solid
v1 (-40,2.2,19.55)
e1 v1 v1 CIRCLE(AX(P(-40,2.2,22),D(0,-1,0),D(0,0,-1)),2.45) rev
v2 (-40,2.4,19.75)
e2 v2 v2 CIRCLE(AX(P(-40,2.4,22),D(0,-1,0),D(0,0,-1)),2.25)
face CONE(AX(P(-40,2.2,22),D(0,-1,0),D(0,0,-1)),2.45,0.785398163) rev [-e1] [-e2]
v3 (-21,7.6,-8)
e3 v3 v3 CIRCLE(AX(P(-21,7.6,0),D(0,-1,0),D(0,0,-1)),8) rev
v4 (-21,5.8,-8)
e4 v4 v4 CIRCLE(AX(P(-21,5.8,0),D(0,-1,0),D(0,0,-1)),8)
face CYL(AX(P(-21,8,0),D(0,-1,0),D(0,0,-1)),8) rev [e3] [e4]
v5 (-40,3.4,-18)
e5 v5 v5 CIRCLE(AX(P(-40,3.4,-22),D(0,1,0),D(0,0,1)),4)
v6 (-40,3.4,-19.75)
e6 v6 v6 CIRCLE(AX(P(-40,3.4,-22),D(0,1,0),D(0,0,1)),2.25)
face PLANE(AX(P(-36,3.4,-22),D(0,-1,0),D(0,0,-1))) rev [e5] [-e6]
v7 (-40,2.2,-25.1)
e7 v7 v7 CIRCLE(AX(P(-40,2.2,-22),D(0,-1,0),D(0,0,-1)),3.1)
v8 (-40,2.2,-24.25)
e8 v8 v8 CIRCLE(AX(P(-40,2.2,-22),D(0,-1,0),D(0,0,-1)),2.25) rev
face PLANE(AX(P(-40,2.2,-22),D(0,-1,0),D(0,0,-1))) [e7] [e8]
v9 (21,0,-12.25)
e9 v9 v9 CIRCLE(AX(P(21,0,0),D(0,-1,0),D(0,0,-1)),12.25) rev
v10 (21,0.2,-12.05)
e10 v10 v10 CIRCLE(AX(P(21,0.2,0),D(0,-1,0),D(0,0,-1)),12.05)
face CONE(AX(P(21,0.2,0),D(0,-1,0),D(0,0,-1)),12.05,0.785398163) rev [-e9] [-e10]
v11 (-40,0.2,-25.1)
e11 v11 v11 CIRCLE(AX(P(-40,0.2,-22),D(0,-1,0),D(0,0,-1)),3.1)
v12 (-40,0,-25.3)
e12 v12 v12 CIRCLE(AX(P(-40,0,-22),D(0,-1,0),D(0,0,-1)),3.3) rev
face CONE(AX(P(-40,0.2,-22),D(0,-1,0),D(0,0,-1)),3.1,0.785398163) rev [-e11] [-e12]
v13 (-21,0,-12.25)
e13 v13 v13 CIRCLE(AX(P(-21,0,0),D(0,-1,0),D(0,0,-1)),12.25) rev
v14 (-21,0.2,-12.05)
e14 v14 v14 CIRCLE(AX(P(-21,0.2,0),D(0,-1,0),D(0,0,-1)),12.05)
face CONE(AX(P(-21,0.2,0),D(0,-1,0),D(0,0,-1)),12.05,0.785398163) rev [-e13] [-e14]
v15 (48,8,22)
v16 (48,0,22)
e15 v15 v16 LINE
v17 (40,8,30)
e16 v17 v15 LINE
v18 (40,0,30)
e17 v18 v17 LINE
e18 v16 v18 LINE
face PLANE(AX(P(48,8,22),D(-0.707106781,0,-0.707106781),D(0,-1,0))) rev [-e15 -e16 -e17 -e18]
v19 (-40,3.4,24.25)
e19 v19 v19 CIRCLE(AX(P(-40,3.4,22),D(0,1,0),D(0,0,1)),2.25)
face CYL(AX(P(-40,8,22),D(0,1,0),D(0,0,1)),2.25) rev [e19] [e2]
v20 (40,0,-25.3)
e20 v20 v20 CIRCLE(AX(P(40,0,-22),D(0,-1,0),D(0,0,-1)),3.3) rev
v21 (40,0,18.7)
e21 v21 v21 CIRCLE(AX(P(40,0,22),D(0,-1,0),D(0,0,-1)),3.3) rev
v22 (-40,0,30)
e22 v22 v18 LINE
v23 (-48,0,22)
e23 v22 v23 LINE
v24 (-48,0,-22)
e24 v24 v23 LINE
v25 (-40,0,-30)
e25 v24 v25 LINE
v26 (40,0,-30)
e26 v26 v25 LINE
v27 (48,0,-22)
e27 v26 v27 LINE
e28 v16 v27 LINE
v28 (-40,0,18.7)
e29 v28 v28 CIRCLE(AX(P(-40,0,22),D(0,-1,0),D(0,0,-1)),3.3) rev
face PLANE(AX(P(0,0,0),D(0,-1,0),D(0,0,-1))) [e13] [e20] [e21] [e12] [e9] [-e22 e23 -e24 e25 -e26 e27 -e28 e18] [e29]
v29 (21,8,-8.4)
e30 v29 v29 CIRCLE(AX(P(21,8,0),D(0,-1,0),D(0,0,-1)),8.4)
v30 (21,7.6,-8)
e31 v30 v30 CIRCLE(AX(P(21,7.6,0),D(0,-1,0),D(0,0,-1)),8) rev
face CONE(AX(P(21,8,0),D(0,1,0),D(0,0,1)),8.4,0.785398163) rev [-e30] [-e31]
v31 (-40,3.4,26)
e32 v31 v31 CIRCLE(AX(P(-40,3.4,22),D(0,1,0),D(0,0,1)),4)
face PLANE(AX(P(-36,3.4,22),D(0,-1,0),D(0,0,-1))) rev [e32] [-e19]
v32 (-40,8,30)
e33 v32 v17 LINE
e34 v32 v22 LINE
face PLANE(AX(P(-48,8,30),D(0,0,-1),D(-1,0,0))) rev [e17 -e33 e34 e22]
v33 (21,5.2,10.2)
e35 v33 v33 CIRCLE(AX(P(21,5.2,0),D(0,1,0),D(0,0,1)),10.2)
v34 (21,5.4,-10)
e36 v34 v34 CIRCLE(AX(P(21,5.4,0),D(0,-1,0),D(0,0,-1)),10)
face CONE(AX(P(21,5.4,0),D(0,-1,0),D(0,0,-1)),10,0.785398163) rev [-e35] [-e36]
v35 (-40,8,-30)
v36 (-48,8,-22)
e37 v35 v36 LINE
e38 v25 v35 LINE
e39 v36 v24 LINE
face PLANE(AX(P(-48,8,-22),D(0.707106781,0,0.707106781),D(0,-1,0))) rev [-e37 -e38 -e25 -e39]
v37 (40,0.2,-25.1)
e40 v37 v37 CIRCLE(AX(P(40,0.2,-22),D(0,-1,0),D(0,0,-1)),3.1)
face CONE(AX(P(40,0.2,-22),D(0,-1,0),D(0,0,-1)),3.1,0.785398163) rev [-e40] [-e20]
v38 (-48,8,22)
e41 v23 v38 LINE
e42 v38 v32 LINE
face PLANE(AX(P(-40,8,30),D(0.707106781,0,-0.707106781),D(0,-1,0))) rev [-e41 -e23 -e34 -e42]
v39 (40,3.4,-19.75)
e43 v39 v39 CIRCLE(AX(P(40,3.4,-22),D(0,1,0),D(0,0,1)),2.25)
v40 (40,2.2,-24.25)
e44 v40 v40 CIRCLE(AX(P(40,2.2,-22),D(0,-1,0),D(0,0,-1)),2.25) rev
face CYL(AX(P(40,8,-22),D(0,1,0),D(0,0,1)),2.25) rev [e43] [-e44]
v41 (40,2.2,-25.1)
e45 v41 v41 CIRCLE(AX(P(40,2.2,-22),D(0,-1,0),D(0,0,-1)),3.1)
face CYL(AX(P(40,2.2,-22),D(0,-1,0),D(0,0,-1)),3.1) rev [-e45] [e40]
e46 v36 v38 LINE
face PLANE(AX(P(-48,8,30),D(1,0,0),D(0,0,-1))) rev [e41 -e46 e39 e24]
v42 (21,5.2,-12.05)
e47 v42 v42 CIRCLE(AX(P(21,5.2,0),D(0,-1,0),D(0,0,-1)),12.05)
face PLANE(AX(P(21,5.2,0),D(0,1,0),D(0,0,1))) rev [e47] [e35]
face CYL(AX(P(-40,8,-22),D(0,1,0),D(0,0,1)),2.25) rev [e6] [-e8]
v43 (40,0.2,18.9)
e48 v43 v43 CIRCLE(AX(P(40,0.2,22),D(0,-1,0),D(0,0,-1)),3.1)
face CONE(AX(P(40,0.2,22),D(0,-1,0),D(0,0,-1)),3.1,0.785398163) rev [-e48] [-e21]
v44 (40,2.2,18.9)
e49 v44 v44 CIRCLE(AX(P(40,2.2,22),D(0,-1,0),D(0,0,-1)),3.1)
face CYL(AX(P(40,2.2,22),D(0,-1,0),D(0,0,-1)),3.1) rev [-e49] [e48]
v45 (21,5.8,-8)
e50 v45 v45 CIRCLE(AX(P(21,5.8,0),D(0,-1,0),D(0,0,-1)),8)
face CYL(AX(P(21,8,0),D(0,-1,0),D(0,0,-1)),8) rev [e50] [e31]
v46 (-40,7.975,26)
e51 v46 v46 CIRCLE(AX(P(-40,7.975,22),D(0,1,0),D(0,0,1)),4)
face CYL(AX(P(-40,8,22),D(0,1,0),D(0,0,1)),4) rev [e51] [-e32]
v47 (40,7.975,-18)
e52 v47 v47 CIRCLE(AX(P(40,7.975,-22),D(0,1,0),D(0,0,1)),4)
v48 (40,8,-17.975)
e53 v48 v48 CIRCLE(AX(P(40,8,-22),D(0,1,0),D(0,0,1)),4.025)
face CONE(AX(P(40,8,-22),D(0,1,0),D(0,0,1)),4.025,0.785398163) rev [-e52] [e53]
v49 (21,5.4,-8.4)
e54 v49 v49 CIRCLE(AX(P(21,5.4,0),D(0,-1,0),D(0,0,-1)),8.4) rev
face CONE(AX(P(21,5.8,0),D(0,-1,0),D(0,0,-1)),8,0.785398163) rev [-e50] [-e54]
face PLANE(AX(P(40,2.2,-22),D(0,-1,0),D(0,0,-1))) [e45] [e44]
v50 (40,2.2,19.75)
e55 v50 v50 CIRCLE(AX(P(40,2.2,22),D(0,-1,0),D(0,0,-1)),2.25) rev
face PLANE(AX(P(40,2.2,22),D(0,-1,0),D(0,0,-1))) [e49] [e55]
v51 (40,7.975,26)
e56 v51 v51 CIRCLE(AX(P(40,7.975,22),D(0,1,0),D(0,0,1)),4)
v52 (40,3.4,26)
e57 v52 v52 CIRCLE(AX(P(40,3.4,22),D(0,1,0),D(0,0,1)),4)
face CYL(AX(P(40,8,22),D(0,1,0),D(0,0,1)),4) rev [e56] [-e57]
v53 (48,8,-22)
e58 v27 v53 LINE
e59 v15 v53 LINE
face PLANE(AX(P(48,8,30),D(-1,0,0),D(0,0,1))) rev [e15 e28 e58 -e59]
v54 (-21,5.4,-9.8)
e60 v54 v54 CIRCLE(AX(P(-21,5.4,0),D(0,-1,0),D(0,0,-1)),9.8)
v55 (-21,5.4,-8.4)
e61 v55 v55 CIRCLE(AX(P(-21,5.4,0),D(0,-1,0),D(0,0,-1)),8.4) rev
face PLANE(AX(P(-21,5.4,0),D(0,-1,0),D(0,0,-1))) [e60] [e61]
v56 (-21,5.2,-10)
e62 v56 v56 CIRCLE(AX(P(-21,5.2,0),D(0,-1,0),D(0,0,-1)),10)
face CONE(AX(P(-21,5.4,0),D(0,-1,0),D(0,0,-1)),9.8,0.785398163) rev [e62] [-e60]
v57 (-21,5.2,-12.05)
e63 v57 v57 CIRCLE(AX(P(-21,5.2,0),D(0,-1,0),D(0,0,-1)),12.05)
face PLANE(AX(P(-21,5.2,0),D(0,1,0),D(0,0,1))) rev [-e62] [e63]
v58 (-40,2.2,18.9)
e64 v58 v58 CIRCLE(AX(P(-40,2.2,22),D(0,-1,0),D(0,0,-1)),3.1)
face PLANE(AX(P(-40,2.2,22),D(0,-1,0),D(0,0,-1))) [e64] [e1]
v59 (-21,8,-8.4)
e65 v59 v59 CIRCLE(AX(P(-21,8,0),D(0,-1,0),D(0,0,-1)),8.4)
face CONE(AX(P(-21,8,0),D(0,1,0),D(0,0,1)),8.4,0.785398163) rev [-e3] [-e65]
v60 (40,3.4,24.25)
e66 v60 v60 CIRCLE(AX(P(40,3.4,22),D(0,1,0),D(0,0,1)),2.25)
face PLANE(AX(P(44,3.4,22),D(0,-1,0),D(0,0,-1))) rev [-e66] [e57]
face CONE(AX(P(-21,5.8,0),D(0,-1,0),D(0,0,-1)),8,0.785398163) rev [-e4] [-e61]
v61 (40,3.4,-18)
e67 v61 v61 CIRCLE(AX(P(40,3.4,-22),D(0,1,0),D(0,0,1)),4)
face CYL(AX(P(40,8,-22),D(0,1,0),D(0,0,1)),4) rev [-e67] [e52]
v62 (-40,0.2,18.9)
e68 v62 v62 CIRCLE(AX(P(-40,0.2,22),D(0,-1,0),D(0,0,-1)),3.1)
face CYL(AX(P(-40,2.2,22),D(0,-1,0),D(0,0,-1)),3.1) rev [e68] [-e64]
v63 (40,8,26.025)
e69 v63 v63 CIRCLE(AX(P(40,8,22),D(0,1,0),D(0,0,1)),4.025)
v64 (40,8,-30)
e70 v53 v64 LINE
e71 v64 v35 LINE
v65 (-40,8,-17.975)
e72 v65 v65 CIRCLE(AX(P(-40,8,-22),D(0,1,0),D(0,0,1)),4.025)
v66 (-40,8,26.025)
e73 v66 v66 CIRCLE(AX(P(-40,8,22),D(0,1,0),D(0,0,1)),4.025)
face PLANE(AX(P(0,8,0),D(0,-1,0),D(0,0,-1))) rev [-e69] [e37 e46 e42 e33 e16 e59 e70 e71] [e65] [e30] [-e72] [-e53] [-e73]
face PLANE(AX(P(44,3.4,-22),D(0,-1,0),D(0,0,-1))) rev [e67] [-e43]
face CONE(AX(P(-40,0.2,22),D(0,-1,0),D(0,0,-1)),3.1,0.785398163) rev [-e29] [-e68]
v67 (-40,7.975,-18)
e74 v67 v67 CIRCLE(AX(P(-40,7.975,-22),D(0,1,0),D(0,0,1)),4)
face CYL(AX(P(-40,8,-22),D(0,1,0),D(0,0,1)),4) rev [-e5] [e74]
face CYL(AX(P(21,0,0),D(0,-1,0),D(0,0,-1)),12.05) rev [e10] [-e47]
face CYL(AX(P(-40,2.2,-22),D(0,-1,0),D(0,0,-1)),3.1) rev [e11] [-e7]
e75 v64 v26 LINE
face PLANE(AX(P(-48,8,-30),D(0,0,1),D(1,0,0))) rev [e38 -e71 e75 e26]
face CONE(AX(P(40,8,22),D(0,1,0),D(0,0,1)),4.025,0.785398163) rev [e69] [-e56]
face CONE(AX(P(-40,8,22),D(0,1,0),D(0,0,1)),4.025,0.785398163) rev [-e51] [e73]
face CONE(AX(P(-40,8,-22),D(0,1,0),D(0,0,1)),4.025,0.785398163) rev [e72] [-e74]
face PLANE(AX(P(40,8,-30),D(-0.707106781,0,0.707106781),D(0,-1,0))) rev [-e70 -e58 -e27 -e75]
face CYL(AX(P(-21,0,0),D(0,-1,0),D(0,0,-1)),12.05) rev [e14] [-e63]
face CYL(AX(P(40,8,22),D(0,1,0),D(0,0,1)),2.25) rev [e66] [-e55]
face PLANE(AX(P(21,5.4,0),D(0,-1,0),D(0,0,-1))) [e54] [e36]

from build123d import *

# Parameters (mm, degrees)
SKETCH1_W           = 96
SKETCH1_H           = 60
BOSS_EXTRUDE1_DEPTH = 8
CHAMFER1_SIZE       = 8
HOLE4_D             = 24.1
HOLE4_DEPTH         = 5.2
SKETCH10_R          = 10
CUT_EXTRUDE1_DEPTH  = 0.2
CHAMFER2_SIZE       = 0.2
SKETCH11_R          = 3.1
CUT_EXTRUDE2_DEPTH  = 2.2
CHAMFER3_SIZE       = 0.2
SKETCH15_R          = 8
CUT_EXTRUDE3_DEPTH  = 57.860882863
CHAMFER4_SIZE       = 0.4


# Read off the part's stored shape, not the designer's step: CBORE for M4 SHCS1, Sketch-Pattern1
with BuildPart() as part:
    # Sketch1 → Boss-Extrude1 (new body)
    with BuildSketch(Plane(origin=(0, 0, 0), x_dir=(1, 0, 0), z_dir=(0, 1, 0))):
        Rectangle(SKETCH1_W, SKETCH1_H)
    extrude(amount=BOSS_EXTRUDE1_DEPTH)

    # Chamfer1
    chamfer1_edges = [part.edges().sort_by_distance(p)[0] for p in [
        (48, 4, 30),
        (-48, 4, 30),
        (-48, 4, -30),
        (48, 4, -30),
    ]]
    chamfer(chamfer1_edges, length=CHAMFER1_SIZE)

    # Hole4
    with Locations(Plane(origin=(0, 0, 0), x_dir=(-1, 0, 0), z_dir=(0, -1, 0))):
        with Locations((21, 0), (-21, 0)):
            Hole(HOLE4_D / 2, depth=HOLE4_DEPTH)

    # CBORE for M4 SHCS1 outline → CBORE for M4 SHCS1 (revolve, cut)
    with BuildSketch(Plane(origin=(40, 0, 22), x_dir=(1, 0, 0), z_dir=(0, 0, 1))):
        Polygon((0, 0), (2.25, 0), (2.25, 3.4), (4, 3.4), (4, 7.975), (4.025, 8), (0, 8), align=None)
    revolve(axis=Axis((40, 0, 22), (0, 1, 0)), mode=Mode.SUBTRACT)

    # CBORE for M4 SHCS1 2 outline → CBORE for M4 SHCS1 2 (revolve, cut)
    with BuildSketch(Plane(origin=(-40, 0, -22), x_dir=(1, 0, 0), z_dir=(0, 0, 1))):
        Polygon((0, 8), (0, 0), (2.25, 0), (2.25, 3.4), (4, 3.4), (4, 7.975), (4.025, 8), align=None)
    revolve(axis=Axis((-40, 0, -22), (0, 1, 0)), mode=Mode.SUBTRACT)

    # CBORE for M4 SHCS1 3 outline → CBORE for M4 SHCS1 3 (revolve, cut)
    with BuildSketch(Plane(origin=(-40, 0, 22), x_dir=(1, 0, 0), z_dir=(0, 0, 1))):
        Polygon((0, 8), (0, 0), (2.25, 0), (2.25, 3.4), (4, 3.4), (4, 7.975), (4.025, 8), align=None)
    revolve(axis=Axis((-40, 0, 22), (0, 1, 0)), mode=Mode.SUBTRACT)

    # CBORE for M4 SHCS1 4 outline → CBORE for M4 SHCS1 4 (revolve, cut)
    with BuildSketch(Plane(origin=(40, 0, -22), x_dir=(1, 0, 0), z_dir=(0, 0, 1))):
        Polygon((0, 8), (0, 0), (2.25, 0), (2.25, 3.4), (4, 3.4), (4, 7.975), (4.025, 8), align=None)
    revolve(axis=Axis((40, 0, -22), (0, 1, 0)), mode=Mode.SUBTRACT)

    # Sketch10 → Cut-Extrude1 (cut)
    with BuildSketch(Plane.XZ.offset(-5.2)):
        with Locations(Location((-21, 0, 0), (0, 0, 270))):
            Circle(SKETCH10_R)
        with Locations(Location((21, 0, 0), (0, 0, 270))):
            Circle(SKETCH10_R)
    extrude(amount=-CUT_EXTRUDE1_DEPTH, mode=Mode.SUBTRACT)

    # Chamfer2
    chamfer2_edges = [part.edges().sort_by_distance(p)[0] for p in [
        (-33.05, 0, 0),
        (8.95, 0, 0),
        (-21, 5.4, 10),
        (21, 5.2, 10),
    ]]
    chamfer(chamfer2_edges, length=CHAMFER2_SIZE - 0.0001)  # a hair under: the kernel refuses the full size

    # Sketch11 → Cut-Extrude2 (cut)
    with BuildSketch(Plane.XZ):
        with Locations(Location((-40, 22, 0), (0, 0, 270))):
            Circle(SKETCH11_R)
    extrude(amount=-CUT_EXTRUDE2_DEPTH, mode=Mode.SUBTRACT)

    # Chamfer3
    chamfer3_edges = [part.edges().sort_by_distance(p)[0] for p in [
        (-40, 0, 25.1),
        (-42.25, 2.2, 22),
    ]]
    chamfer(chamfer3_edges, length=CHAMFER3_SIZE)

    # Sketch-Pattern1 outline → Sketch-Pattern1 (revolve, cut)
    with BuildSketch(Plane(origin=(40, 0, -22), x_dir=(1, 0, 0), z_dir=(0, 0, 1))):
        Polygon((3.1, 2.2), (2.25, 2.2), (2.25, 0), (3.3, 0), (3.1, 0.2), align=None)
    revolve(axis=Axis((40, 0, -22), (0, 1, 0)), mode=Mode.SUBTRACT)

    # Sketch-Pattern1 2 outline → Sketch-Pattern1 2 (revolve, cut)
    with BuildSketch(Plane(origin=(-40, 0, -22), x_dir=(1, 0, 0), z_dir=(0, 0, 1))):
        Polygon((3.1, 2.2), (2.25, 2.2), (2.25, 0), (3.3, 0), (3.1, 0.2), align=None)
    revolve(axis=Axis((-40, 0, -22), (0, 1, 0)), mode=Mode.SUBTRACT)

    # Sketch-Pattern1 3 outline → Sketch-Pattern1 3 (revolve, cut)
    with BuildSketch(Plane(origin=(40, 0, 22), x_dir=(1, 0, 0), z_dir=(0, 0, 1))):
        Polygon((3.1, 2.2), (2.25, 2.2), (2.25, 0), (3.3, 0), (3.1, 0.2), align=None)
    revolve(axis=Axis((40, 0, 22), (0, 1, 0)), mode=Mode.SUBTRACT)

    # Sketch15 → Cut-Extrude3 (cut, through all)
    with BuildSketch(Plane.XZ.offset(-5.4)):
        with Locations(Location((-21, 0, 0), (0, 0, 270))):
            Circle(SKETCH15_R)
        with Locations(Location((21, 0, 0), (0, 0, 270))):
            Circle(SKETCH15_R)
    extrude(amount=-CUT_EXTRUDE3_DEPTH, mode=Mode.SUBTRACT)

    # Chamfer4
    chamfer4_edges = [part.edges().sort_by_distance(p)[0] for p in [
        (-21, 8, 8),
        (-21, 5.4, 8),
        (21, 8, 8),
        (21, 5.4, 8),
    ]]
    chamfer(chamfer4_edges, length=CHAMFER4_SIZE)


solid = part.part
